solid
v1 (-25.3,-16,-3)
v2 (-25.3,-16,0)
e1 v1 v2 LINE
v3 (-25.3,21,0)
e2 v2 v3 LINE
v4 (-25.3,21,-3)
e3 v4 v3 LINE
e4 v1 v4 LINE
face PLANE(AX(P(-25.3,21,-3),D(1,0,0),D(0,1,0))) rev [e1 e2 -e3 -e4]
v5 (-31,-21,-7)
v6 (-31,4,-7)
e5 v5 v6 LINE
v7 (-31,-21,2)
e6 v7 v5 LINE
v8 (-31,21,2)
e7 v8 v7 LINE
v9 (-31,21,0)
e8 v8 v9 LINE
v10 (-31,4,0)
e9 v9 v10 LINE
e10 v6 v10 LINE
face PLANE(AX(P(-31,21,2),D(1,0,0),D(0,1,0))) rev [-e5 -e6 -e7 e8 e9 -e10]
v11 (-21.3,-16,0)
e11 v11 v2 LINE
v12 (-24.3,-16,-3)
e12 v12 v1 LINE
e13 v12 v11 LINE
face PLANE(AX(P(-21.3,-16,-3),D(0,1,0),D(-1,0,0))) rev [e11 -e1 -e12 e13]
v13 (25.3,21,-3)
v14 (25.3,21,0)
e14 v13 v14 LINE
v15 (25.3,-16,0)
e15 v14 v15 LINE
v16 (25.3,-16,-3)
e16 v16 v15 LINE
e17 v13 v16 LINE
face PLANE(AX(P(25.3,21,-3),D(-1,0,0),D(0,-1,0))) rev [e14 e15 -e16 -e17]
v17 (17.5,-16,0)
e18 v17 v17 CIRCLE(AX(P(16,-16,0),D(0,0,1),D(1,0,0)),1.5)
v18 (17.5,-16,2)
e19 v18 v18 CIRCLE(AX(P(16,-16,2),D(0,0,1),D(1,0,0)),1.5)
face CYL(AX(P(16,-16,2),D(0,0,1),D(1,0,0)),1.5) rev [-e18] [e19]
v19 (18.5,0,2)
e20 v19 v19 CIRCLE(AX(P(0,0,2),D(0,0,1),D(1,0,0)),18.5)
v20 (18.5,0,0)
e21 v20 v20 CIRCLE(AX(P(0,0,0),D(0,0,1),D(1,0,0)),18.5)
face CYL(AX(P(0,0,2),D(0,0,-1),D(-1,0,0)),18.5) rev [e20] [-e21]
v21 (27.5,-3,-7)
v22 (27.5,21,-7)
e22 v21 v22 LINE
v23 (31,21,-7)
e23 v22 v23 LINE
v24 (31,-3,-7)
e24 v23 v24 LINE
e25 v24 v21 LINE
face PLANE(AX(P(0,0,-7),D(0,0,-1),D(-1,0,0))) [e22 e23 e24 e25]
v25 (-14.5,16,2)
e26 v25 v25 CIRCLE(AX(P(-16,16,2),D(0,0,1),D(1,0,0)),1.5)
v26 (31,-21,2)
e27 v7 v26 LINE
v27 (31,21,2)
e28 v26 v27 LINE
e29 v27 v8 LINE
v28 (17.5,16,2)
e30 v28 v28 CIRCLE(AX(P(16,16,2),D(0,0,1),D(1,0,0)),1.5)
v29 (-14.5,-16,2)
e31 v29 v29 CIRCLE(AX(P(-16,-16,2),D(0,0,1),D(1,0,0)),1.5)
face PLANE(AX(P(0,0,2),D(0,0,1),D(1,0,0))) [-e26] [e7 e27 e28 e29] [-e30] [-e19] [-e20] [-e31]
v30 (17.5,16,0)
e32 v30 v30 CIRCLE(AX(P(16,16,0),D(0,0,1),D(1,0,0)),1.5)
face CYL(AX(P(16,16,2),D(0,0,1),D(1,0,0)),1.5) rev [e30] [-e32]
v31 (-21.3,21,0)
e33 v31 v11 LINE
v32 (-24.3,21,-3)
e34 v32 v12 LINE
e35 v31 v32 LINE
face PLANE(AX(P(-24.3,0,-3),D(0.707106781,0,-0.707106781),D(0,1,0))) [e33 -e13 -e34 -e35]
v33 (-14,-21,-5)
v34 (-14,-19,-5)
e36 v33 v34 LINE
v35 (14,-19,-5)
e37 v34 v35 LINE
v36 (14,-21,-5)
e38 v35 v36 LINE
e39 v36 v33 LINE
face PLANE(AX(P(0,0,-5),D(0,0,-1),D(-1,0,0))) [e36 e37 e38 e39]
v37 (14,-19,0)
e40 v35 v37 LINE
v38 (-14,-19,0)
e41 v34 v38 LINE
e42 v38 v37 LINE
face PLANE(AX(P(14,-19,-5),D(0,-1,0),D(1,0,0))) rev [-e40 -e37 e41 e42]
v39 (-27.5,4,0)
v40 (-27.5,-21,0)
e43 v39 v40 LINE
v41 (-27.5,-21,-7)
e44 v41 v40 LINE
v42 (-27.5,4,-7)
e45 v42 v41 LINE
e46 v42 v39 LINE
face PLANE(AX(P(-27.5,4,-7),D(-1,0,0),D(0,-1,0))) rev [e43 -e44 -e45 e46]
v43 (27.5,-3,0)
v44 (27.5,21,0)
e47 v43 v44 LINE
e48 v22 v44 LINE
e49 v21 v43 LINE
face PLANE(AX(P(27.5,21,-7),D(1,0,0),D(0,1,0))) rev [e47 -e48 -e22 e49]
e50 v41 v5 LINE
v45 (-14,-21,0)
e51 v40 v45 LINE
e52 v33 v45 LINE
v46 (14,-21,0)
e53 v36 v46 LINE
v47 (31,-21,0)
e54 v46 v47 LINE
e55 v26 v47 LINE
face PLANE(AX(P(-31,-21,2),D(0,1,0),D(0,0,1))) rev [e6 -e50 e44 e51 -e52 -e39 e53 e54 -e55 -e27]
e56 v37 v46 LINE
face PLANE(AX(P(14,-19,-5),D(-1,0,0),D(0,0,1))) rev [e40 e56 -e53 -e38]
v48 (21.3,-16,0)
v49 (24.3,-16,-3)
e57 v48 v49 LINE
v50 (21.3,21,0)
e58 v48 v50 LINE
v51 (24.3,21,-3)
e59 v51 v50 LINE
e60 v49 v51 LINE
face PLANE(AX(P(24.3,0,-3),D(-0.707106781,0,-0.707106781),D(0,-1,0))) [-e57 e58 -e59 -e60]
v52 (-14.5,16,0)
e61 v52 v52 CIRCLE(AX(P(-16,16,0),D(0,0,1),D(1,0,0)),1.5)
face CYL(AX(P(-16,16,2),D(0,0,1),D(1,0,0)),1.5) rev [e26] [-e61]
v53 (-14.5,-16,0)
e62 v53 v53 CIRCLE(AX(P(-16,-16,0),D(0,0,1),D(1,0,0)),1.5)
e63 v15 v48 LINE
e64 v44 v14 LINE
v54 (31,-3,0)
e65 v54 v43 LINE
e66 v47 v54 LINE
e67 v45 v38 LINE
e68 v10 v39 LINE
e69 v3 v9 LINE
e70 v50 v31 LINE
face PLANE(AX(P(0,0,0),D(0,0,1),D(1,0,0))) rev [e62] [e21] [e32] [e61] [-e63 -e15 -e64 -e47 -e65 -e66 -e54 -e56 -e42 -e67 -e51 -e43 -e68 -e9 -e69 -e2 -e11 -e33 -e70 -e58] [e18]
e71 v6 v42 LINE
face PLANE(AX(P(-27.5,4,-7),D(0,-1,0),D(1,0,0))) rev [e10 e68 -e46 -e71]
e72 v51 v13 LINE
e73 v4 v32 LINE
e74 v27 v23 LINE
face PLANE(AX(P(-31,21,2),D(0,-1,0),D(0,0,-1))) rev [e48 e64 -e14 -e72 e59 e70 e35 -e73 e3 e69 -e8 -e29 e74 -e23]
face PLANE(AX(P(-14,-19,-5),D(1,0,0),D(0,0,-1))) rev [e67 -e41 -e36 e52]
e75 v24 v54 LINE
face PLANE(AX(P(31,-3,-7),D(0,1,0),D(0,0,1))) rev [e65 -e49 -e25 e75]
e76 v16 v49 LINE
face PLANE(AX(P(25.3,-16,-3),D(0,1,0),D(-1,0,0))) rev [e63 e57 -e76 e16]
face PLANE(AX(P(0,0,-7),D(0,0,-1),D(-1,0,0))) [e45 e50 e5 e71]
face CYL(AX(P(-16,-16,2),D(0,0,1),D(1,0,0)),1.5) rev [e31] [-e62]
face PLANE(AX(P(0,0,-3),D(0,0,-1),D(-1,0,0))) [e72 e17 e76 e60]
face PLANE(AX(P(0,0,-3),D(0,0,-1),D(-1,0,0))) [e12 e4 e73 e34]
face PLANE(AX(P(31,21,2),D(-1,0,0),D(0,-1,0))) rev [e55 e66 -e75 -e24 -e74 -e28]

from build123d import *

# Parameters (mm, degrees)
SKETCH_1_W      = 62
SKETCH_1_H      = 42
SKETCH_1_R      = 18.5
EXTRUDE_1_DEPTH = 2
F_3_0MM_1_D     = 3
SKETCH_4_W      = 3.5
SKETCH_4_H      = 24
SKETCH_4_H_2    = 25
EXTRUDE_2_DEPTH = 7
SKETCH_5_W      = 28
SKETCH_5_H      = 2
EXTRUDE_3_DEPTH = 5
SKETCH_7_W      = 4
SKETCH_7_H      = 37
EXTRUDE_4_DEPTH = 3
CHAMFER_1_SIZE  = 3


with BuildPart() as part:
    # 스케치1 → 보스-돌출1 (new body)
    with BuildSketch(Plane.XY):
        Rectangle(SKETCH_1_W, SKETCH_1_H)
        Circle(SKETCH_1_R, mode=Mode.SUBTRACT)
    extrude(amount=EXTRUDE_1_DEPTH)

    # Ø3.0mm 맞춤핀 구멍1 (through all)
    with Locations(Plane(origin=(-16, 16, 2), x_dir=(1, 0, 0), z_dir=(0, 0, 1))):
        with Locations((0, 0), (32, 0), (32, -32), (0, -32)):
            Hole(F_3_0MM_1_D / 2)

    # 스케치4 → 보스-돌출2 (add)
    with BuildSketch(Plane(origin=(0, 0, 0), x_dir=(-1, 0, 0), z_dir=(0, 0, -1))):
        with Locations((-29.25, 9)):
            Rectangle(SKETCH_4_W, SKETCH_4_H)
        with Locations((29.25, -8.5)):
            Rectangle(SKETCH_4_W, SKETCH_4_H_2)
    extrude(amount=EXTRUDE_2_DEPTH)

    # 스케치5 → 보스-돌출3 (add)
    with BuildSketch(Plane(origin=(0, 0, 0), x_dir=(-1, 0, 0), z_dir=(0, 0, -1))):
        with Locations((0, -20)):
            Rectangle(SKETCH_5_W, SKETCH_5_H)
    extrude(amount=EXTRUDE_3_DEPTH)

    # 스케치7 → 보스-돌출4 (add)
    with BuildSketch(Plane(origin=(0, 0, 0), x_dir=(-1, 0, 0), z_dir=(0, 0, -1))):
        with Locations((-23.3, 2.5)):
            Rectangle(SKETCH_7_W, SKETCH_7_H)
        with Locations((23.3, 2.5)):
            Rectangle(SKETCH_7_W, SKETCH_7_H)
    extrude(amount=EXTRUDE_4_DEPTH)

    # 모따기1
    chamfer_1_edges = [part.edges().sort_by_distance(p)[0] for p in [
        (-21.3, 2.5, -3),
        (21.3, 2.5, -3),
    ]]
    chamfer(chamfer_1_edges, length=CHAMFER_1_SIZE - 0.0001)  # a hair under: the kernel refuses the full size


solid = part.part
